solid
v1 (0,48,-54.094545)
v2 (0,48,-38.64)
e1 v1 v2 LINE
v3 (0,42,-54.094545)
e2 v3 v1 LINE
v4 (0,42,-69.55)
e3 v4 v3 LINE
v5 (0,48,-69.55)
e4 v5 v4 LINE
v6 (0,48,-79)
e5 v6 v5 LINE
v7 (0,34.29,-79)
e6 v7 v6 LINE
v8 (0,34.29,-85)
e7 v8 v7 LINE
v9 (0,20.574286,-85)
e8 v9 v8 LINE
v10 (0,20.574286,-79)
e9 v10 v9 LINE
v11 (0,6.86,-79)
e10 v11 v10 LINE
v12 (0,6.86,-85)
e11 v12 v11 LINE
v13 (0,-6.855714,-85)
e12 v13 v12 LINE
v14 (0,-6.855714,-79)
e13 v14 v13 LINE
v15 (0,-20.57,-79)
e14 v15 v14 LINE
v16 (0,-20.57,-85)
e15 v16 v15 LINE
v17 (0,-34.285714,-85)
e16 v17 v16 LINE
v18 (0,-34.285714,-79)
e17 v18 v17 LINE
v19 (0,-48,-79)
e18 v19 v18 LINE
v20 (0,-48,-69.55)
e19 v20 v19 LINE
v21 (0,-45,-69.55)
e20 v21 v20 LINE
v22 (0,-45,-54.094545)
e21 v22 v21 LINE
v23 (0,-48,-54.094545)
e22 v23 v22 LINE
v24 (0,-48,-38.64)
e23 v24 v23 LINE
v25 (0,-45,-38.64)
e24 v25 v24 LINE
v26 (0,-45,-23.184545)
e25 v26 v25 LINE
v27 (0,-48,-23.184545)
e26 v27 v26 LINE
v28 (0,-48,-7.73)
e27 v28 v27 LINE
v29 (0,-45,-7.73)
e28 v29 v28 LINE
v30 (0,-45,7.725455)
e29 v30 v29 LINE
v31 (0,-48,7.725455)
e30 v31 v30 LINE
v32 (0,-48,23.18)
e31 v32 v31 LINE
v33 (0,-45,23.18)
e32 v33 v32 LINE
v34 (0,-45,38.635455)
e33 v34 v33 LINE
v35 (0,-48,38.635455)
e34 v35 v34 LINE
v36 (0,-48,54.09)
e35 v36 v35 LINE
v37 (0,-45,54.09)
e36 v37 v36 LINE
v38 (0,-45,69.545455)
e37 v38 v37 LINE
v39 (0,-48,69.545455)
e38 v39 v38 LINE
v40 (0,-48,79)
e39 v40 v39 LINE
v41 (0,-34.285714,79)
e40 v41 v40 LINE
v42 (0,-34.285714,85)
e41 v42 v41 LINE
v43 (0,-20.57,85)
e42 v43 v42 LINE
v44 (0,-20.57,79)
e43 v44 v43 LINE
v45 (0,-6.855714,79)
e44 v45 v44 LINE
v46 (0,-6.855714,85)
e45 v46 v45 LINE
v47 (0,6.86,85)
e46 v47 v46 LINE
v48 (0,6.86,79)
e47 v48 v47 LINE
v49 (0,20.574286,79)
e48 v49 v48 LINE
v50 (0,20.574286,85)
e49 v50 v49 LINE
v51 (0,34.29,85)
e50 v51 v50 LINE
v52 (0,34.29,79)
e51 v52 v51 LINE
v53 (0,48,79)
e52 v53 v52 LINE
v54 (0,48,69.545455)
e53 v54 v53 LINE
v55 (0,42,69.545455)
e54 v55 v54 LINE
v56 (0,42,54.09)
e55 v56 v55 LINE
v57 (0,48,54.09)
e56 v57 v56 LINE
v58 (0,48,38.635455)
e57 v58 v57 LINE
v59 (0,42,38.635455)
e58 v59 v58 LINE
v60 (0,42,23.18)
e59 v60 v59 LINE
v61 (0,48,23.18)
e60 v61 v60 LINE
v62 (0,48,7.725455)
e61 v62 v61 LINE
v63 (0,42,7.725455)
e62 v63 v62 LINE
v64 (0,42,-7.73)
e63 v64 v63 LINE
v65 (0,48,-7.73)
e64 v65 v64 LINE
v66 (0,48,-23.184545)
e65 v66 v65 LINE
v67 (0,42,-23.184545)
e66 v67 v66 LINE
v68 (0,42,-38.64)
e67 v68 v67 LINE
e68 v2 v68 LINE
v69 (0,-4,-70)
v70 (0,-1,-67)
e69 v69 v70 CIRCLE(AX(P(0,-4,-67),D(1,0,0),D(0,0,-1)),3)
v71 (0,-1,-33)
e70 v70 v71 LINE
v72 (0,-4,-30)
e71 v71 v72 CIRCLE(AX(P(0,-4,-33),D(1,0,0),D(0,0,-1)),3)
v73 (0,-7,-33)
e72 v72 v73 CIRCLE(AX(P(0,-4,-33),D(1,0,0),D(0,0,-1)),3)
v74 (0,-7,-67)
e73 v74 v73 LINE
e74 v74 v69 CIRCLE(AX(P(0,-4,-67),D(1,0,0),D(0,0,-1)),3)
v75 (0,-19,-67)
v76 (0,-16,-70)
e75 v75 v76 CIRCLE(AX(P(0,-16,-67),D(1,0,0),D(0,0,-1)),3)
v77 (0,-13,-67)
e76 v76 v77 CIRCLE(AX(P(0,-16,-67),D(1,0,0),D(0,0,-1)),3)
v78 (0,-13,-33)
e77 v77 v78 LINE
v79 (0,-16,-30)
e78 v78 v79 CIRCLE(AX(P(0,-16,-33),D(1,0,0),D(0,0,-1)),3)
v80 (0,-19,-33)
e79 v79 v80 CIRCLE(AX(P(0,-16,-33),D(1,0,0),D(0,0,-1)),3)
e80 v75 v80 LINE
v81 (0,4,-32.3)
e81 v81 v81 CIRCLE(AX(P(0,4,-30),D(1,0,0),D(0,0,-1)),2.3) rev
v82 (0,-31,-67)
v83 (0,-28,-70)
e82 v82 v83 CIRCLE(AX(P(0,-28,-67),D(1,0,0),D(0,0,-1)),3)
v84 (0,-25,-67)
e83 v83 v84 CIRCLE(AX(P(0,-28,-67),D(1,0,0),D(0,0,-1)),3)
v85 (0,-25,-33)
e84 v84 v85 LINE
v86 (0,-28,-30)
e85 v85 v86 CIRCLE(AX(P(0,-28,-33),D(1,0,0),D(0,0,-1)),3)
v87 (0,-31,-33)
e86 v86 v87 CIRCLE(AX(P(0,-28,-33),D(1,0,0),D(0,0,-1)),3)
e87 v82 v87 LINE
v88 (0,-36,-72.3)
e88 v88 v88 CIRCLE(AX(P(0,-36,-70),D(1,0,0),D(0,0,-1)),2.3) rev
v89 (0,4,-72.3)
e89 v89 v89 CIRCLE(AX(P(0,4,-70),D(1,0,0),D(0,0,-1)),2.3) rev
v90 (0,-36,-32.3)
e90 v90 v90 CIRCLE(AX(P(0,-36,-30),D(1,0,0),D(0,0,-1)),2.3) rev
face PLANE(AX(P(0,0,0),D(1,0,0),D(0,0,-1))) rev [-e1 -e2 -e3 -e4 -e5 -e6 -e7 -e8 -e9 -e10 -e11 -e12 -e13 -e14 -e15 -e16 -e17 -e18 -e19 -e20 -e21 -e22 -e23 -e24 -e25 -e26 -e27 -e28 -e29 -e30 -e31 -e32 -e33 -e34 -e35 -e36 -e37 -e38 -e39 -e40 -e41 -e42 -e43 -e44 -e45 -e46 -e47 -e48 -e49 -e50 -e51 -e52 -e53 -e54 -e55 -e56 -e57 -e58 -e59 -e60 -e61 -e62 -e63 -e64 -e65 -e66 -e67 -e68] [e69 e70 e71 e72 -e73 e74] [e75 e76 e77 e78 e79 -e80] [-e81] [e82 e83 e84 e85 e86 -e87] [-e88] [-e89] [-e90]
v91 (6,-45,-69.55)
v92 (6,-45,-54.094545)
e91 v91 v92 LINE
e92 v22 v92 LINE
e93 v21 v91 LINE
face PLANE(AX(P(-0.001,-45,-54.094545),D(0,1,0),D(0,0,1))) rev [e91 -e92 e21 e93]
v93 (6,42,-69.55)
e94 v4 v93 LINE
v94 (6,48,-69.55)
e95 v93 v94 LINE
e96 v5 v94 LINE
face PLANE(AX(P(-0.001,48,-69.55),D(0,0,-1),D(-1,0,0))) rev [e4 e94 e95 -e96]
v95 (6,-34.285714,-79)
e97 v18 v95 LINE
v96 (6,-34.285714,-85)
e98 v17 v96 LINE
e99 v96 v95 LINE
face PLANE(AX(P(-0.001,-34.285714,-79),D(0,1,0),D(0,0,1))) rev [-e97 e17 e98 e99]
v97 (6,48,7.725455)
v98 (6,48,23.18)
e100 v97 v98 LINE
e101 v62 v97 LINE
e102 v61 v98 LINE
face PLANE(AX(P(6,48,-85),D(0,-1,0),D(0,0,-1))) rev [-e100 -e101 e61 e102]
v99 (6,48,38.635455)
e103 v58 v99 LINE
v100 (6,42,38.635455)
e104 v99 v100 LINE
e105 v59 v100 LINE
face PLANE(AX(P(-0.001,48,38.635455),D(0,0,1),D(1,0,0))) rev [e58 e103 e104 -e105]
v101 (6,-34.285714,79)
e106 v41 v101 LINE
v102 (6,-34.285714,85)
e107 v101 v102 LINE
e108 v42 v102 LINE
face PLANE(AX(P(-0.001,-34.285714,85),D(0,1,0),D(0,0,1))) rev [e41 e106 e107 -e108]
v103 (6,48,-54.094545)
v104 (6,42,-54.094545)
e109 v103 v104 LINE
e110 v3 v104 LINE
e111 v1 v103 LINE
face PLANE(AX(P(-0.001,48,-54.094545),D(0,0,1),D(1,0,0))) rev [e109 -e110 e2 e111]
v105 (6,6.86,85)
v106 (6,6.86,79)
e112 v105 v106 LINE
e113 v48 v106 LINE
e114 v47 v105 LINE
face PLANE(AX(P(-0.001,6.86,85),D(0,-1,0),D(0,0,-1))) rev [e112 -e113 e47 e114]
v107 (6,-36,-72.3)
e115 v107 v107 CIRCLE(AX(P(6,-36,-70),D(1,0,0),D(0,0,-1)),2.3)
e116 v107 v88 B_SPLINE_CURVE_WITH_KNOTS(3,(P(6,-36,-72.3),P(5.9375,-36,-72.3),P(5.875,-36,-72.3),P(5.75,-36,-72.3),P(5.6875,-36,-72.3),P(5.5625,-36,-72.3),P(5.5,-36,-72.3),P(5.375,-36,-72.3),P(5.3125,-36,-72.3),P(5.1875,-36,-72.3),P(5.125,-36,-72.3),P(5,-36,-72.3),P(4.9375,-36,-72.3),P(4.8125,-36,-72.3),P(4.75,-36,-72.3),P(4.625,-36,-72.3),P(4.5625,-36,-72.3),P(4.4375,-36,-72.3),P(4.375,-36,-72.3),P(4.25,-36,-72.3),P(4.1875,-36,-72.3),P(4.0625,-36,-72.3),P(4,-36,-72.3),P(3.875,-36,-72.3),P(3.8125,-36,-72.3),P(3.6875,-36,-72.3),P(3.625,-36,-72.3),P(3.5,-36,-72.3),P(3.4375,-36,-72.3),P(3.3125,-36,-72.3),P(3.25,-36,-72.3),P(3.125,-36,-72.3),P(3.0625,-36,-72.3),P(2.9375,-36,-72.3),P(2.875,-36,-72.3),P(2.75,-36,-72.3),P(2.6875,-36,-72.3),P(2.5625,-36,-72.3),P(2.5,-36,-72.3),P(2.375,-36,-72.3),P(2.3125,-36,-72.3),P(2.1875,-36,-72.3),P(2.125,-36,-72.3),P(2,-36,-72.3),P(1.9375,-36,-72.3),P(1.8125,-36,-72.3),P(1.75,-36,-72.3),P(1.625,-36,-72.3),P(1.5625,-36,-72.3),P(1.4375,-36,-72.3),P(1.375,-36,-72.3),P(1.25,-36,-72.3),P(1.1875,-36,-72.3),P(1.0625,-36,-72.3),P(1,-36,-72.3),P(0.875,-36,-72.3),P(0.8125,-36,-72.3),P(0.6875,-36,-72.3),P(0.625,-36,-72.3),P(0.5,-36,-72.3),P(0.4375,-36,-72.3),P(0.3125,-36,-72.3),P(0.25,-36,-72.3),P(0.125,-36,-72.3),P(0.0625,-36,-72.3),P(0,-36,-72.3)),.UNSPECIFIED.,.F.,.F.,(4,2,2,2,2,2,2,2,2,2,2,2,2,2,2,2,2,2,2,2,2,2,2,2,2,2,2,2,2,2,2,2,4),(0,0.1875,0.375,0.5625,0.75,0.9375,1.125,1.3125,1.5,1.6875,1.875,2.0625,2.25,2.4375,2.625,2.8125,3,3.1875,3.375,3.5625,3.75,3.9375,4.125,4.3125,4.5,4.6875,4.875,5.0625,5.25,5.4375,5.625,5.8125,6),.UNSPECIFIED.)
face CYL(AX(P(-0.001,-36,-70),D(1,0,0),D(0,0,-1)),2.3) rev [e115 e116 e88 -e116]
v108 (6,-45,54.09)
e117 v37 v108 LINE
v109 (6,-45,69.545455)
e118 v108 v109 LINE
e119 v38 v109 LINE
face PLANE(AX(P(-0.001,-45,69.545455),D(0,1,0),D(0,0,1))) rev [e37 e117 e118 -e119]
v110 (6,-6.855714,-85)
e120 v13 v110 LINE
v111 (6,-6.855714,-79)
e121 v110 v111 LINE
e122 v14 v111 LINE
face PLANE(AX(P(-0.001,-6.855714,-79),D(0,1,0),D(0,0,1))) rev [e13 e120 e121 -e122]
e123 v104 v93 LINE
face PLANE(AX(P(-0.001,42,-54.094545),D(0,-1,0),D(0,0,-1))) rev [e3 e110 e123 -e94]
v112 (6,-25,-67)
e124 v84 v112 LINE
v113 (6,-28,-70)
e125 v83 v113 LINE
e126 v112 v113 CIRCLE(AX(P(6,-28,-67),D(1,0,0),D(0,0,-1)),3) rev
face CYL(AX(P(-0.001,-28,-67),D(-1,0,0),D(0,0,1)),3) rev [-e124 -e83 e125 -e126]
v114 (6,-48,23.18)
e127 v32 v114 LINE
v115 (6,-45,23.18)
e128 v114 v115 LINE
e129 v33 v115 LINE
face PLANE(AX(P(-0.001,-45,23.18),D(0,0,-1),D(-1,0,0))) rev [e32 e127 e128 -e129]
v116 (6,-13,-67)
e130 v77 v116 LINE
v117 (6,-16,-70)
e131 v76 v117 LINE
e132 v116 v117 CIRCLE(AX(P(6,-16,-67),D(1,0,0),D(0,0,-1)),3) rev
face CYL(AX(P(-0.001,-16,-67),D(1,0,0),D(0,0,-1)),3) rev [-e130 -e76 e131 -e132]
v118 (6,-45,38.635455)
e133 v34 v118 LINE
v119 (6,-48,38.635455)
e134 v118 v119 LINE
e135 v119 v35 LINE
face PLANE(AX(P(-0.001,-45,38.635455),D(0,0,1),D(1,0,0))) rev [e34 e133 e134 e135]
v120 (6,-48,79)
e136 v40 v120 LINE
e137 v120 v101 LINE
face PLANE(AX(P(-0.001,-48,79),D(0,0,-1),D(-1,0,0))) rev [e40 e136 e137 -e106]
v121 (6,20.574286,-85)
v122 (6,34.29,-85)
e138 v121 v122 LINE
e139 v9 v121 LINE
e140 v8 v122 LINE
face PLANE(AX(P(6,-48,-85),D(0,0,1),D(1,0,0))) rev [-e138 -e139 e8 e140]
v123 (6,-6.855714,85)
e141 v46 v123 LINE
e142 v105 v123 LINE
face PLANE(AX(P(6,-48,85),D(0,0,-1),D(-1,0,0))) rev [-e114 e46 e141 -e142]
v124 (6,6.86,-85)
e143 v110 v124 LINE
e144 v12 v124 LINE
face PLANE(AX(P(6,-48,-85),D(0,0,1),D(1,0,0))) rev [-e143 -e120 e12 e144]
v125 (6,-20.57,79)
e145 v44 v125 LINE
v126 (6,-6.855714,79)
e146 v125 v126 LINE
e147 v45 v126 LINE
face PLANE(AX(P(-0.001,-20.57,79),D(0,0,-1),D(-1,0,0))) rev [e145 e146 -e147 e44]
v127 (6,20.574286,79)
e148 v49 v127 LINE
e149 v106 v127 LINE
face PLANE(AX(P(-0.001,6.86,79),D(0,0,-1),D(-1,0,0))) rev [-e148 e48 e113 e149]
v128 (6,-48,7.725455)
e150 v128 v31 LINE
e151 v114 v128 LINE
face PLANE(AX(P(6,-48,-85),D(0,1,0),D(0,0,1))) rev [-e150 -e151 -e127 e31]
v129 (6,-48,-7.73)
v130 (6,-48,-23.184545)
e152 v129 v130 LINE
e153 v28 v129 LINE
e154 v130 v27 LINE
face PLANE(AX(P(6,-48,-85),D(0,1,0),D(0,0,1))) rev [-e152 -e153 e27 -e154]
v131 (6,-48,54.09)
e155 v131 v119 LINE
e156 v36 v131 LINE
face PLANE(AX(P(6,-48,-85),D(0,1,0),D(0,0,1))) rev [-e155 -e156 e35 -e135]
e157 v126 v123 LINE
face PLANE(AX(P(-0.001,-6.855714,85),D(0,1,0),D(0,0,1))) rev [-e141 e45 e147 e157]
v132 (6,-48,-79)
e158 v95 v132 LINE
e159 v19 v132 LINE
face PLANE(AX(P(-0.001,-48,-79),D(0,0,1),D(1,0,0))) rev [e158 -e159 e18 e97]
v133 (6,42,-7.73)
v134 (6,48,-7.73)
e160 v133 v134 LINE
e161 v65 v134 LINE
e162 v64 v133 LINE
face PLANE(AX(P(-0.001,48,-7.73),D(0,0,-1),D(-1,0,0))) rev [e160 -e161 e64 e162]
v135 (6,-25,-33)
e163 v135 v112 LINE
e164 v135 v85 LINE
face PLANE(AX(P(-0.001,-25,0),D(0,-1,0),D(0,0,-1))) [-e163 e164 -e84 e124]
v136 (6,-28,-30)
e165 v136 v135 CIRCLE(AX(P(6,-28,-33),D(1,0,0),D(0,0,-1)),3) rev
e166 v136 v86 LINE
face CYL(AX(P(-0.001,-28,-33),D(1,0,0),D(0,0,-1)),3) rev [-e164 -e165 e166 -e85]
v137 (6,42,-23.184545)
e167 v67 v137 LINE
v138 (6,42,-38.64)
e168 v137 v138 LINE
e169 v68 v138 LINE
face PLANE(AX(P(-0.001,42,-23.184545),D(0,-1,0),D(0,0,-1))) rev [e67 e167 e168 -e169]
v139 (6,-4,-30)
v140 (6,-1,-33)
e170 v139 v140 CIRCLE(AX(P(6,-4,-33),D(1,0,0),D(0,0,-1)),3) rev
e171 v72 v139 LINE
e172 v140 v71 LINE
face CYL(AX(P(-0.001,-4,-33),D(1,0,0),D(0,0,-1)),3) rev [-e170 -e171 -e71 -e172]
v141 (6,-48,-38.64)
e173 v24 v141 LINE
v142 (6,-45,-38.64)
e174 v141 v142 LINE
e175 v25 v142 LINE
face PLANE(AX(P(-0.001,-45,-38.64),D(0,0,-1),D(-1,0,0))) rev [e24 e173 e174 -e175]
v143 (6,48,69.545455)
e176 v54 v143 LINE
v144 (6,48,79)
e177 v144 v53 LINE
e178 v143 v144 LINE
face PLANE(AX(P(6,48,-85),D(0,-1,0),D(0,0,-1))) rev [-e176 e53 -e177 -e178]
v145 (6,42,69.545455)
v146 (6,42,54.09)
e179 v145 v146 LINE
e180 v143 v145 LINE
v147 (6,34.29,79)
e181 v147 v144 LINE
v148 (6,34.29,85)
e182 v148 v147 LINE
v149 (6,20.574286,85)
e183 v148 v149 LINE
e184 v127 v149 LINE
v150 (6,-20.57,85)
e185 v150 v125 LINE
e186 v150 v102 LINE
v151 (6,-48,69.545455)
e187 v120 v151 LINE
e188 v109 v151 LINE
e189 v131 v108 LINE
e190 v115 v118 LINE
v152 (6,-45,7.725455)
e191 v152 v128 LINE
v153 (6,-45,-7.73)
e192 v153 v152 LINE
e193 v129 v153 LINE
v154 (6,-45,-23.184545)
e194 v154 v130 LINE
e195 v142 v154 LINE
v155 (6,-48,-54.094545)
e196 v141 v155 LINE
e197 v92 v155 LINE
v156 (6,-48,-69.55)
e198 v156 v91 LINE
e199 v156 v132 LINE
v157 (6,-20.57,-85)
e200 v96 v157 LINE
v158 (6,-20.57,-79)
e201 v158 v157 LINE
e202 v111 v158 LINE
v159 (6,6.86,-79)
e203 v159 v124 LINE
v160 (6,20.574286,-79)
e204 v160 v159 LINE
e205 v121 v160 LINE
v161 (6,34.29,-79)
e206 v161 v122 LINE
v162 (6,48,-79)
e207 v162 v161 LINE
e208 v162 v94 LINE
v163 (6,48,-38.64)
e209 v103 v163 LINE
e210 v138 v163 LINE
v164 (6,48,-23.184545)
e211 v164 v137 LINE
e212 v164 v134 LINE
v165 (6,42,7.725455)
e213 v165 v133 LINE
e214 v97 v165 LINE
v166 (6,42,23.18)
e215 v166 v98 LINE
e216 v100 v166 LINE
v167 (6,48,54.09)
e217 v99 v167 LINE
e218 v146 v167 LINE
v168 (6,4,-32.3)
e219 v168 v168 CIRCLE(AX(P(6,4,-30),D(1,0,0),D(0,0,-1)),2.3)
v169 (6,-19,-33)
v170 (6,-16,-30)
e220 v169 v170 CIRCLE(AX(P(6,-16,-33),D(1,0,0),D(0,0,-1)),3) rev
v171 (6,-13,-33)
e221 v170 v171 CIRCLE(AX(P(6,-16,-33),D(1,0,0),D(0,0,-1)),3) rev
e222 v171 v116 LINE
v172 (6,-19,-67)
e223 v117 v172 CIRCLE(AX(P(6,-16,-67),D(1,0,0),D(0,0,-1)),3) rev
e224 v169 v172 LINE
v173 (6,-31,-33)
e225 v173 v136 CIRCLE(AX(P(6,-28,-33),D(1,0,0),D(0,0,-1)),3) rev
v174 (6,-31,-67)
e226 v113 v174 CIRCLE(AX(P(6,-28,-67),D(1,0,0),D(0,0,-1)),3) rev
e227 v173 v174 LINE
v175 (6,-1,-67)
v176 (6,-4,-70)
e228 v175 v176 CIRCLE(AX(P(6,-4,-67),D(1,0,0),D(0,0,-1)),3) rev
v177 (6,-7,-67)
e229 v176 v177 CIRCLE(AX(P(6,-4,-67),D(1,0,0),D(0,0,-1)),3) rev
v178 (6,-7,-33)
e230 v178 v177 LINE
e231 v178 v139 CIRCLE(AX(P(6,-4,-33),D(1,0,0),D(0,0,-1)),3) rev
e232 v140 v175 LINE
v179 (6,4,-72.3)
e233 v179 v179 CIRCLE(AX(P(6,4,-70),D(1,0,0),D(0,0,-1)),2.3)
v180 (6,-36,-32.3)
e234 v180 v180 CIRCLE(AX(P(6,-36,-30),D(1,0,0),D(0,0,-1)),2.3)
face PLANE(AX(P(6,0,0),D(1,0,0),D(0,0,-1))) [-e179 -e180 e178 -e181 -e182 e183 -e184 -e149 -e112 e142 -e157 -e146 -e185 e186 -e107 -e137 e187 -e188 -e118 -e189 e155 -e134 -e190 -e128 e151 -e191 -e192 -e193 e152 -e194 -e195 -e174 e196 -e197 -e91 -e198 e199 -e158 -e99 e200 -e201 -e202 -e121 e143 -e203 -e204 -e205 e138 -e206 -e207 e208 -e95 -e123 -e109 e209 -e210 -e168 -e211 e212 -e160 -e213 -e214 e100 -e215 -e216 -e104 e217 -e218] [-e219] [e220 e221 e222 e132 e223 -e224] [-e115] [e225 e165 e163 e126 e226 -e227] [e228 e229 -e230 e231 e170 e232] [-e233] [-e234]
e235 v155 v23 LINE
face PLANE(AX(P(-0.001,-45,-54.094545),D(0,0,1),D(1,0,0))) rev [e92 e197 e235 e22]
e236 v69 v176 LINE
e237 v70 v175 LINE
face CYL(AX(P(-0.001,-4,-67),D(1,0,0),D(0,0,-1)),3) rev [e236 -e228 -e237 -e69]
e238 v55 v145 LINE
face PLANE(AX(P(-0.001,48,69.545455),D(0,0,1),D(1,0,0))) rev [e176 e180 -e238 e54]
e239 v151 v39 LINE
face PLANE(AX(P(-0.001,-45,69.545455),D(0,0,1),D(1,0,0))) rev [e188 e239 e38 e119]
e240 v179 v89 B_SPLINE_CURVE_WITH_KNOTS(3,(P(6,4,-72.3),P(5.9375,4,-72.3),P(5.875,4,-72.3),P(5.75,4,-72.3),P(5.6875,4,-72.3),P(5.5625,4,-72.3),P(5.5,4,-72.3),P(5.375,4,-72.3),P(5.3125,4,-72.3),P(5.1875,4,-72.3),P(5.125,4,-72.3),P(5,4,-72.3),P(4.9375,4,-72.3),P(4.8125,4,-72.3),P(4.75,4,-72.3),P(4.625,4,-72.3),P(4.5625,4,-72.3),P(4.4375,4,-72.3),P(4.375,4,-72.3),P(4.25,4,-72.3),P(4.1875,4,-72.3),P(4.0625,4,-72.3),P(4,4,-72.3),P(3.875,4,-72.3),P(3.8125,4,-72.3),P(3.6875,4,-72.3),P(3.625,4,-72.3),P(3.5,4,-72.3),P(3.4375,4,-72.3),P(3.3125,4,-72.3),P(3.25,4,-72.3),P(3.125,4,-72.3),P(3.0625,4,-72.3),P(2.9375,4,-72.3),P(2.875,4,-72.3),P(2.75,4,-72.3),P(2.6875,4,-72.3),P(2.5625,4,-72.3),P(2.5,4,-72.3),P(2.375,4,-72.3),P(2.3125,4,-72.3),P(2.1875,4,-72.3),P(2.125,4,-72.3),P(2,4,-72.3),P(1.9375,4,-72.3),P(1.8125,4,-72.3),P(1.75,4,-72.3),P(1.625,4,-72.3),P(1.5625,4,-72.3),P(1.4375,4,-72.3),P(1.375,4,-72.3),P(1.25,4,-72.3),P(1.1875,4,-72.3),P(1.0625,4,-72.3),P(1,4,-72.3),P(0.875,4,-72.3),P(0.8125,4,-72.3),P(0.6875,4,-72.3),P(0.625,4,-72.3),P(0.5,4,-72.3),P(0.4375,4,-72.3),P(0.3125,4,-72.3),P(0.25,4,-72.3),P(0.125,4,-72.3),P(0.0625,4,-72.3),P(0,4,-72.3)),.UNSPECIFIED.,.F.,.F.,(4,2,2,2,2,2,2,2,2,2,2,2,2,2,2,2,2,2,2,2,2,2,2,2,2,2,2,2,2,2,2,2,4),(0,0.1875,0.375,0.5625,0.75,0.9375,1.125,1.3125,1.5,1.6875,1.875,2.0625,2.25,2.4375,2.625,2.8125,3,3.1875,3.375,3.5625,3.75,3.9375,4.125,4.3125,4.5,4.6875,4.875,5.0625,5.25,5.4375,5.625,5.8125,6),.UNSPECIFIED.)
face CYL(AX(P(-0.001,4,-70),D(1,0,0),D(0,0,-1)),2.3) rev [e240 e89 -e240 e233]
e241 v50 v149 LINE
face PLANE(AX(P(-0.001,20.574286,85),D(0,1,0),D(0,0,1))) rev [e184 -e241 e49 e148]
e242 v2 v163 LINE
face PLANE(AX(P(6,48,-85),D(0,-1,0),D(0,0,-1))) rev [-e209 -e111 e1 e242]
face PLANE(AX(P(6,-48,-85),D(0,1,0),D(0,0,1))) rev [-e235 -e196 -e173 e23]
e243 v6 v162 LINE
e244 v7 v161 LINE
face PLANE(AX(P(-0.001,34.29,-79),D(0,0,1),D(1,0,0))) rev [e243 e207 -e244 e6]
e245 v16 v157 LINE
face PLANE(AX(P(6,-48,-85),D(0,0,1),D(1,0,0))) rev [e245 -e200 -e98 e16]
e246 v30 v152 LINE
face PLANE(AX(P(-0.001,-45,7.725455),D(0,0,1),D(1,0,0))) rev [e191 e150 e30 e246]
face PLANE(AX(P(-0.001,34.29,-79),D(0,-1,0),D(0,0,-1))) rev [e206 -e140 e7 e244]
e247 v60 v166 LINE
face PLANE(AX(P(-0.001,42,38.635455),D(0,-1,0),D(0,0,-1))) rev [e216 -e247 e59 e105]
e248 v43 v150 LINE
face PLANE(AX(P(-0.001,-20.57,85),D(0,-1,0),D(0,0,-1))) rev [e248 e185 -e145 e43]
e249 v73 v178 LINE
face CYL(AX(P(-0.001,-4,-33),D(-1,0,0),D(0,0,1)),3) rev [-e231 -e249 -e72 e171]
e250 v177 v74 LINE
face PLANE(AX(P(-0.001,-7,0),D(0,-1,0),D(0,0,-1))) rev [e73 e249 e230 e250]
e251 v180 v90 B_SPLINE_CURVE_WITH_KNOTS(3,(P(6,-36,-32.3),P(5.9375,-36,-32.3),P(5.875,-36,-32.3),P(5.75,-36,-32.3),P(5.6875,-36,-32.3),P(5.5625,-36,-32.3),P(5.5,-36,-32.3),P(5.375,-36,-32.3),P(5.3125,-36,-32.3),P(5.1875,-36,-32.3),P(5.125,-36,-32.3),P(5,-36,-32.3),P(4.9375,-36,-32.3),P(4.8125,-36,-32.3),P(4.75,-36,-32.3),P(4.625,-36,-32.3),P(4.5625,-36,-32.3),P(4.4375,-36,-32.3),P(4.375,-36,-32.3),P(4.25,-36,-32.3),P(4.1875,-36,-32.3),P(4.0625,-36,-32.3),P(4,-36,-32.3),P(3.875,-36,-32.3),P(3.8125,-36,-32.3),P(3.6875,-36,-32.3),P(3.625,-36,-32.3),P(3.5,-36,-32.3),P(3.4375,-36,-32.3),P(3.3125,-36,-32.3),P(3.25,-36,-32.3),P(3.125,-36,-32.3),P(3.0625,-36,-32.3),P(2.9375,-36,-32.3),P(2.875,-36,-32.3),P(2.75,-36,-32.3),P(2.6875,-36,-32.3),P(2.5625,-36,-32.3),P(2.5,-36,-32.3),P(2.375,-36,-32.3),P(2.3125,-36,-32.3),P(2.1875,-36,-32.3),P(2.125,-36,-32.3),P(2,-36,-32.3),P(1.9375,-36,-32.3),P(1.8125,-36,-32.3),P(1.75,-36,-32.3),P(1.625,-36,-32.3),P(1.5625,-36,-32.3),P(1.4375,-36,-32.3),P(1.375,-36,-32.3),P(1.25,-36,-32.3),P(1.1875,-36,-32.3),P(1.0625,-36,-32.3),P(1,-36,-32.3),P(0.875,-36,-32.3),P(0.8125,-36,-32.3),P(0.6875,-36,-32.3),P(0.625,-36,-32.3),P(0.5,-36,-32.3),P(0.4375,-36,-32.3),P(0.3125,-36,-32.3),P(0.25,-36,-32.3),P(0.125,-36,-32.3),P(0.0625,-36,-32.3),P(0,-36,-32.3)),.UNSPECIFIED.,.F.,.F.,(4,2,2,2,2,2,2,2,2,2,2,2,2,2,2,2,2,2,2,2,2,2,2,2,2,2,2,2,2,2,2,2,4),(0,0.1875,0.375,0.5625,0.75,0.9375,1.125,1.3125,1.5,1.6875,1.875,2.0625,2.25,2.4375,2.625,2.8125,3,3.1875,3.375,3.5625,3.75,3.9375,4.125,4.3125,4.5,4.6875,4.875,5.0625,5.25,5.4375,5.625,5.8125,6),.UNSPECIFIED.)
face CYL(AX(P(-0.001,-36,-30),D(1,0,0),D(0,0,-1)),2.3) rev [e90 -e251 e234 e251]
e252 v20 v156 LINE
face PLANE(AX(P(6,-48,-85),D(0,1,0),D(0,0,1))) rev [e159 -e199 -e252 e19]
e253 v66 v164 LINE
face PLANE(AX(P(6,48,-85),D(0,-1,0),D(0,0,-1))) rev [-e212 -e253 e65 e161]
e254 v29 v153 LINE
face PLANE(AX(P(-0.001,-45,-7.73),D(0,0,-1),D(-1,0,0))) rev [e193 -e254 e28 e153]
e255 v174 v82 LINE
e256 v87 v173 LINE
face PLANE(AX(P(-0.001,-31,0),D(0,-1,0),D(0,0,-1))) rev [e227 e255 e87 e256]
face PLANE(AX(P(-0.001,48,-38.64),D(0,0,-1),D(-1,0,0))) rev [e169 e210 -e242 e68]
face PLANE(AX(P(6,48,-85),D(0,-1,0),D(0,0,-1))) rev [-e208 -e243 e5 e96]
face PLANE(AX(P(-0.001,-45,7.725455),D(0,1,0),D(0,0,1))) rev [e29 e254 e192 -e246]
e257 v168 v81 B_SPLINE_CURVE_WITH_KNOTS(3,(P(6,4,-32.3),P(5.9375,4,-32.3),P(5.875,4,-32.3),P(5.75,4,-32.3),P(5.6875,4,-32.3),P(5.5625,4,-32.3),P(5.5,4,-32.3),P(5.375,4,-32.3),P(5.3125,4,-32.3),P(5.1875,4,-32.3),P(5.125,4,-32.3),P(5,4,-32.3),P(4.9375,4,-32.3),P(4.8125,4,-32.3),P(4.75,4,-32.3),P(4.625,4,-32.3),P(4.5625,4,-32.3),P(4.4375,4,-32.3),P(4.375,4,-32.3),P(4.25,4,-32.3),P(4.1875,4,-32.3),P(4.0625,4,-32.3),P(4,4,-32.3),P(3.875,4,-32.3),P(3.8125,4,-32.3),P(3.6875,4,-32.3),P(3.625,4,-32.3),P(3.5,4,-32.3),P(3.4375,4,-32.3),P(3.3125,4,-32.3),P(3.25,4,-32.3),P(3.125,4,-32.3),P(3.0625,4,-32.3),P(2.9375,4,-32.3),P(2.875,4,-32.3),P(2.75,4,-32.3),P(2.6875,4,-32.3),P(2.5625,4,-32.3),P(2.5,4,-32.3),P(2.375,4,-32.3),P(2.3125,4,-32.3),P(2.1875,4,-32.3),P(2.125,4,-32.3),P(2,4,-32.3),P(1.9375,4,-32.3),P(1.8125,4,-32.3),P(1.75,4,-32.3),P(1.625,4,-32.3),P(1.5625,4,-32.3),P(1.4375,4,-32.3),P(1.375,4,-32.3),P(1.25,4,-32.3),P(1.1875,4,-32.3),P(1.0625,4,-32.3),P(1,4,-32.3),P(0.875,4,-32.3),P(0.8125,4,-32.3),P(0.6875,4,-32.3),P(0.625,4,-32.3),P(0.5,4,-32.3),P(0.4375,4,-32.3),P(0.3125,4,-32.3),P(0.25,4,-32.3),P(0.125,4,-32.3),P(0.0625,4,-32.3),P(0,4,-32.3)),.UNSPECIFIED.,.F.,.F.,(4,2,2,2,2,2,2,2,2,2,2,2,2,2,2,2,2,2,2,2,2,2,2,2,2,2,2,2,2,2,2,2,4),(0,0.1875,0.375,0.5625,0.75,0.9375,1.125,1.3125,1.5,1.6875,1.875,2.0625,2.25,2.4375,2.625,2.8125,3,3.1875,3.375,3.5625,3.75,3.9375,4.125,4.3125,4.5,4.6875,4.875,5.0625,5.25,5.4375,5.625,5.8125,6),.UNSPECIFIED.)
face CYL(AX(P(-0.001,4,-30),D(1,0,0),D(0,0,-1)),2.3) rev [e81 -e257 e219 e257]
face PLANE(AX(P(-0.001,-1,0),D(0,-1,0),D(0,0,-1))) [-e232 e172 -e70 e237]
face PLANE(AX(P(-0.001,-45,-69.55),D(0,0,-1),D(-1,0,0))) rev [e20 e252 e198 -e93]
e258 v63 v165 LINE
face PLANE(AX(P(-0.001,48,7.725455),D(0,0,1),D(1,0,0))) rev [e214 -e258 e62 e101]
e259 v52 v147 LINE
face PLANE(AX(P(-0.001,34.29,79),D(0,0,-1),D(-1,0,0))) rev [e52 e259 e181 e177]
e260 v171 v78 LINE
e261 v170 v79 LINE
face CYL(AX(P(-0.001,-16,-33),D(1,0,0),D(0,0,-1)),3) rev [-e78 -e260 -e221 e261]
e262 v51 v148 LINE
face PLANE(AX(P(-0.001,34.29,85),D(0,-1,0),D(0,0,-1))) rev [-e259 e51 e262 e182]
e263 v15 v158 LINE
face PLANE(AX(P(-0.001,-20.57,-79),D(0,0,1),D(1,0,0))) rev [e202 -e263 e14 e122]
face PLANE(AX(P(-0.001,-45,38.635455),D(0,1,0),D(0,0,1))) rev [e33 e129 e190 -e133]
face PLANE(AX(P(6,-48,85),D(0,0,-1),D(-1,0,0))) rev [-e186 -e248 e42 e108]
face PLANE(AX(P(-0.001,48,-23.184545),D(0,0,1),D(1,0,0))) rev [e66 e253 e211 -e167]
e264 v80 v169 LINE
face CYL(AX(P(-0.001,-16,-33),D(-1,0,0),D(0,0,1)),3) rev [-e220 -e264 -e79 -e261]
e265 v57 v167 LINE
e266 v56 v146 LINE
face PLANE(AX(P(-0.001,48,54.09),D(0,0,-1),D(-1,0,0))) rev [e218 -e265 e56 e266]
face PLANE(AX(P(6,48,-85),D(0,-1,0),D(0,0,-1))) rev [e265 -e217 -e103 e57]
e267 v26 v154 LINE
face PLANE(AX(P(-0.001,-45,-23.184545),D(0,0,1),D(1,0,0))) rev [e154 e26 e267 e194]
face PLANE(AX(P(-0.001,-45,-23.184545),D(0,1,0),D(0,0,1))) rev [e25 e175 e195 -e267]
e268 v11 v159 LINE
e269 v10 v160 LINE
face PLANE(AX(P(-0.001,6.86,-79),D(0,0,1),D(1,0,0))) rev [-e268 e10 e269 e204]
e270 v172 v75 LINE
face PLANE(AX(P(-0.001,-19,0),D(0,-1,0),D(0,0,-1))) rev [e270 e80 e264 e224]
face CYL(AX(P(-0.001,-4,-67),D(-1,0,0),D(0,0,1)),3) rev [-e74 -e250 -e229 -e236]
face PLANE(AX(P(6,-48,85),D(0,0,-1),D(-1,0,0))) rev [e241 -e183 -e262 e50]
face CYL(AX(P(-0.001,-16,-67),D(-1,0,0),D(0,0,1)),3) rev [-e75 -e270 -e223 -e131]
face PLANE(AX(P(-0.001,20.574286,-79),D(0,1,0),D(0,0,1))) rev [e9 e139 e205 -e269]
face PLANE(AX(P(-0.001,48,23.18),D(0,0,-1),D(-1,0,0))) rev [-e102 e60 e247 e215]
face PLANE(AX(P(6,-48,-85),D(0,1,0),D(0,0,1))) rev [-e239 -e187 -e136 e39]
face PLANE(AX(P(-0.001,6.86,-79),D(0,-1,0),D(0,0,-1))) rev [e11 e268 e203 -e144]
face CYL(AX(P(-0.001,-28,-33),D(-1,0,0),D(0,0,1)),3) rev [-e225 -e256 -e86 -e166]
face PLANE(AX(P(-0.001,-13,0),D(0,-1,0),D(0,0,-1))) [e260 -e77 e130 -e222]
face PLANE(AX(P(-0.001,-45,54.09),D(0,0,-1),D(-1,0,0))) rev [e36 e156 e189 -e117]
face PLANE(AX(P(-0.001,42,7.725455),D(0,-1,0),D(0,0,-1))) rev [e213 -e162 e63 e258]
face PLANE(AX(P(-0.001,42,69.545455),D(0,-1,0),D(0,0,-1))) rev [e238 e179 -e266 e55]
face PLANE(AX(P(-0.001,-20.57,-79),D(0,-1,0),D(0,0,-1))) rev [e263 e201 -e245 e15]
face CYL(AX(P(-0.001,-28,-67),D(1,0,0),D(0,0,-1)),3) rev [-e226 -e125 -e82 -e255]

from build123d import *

# Parameters (mm, degrees)
ESBO_O1_W                = 170
ESBO_O1_H                = 96
RESSALTO_EXTRUS_O1_DEPTH = 6
CORTE_EXTRUS_O1_REACH    = 99.801
ESBO_O2_W                = 15.455454545
ESBO_O2_H                = 6
CORTE_EXTRUS_O2_REACH    = 99.801
ESBO_O3_W                = 6
ESBO_O3_H                = 13.714285714
CORTE_EXTRUS_O3_REACH    = 99.801
ESBO_O4_W                = 40
ESBO_O4_H                = 6
ESBO_O4_R                = 2.3
FILETE1_R                = 3


with BuildPart() as part:
    # Esboço1 → Ressalto-extrusão1 (new body)
    with BuildSketch(Plane(origin=(0, 0, 0), x_dir=(0, 0, -1), z_dir=(1, 0, 0))):
        Rectangle(ESBO_O1_W, ESBO_O1_H)
    extrude(amount=RESSALTO_EXTRUS_O1_DEPTH)

    # Esboço2 → Corte-extrusão1 (cut, up to next)
    with BuildSketch(Plane(origin=(6, 0, 0), x_dir=(0, 0, -1), z_dir=(1, 0, 0)), mode=Mode.PRIVATE) as corte_extrus_o1_sk1:
        with Locations((0.002272727, 45)):
            Rectangle(ESBO_O2_W, ESBO_O2_H)
    corte_extrus_o1_tool1 = extrude(corte_extrus_o1_sk1.sketch, amount=-CORTE_EXTRUS_O1_REACH, mode=Mode.PRIVATE) & part.part
    # Esboço2 → Corte-extrusão1 (cut, up to next)
    with BuildSketch(Plane(origin=(6, 0, 0), x_dir=(0, 0, -1), z_dir=(1, 0, 0)), mode=Mode.PRIVATE) as corte_extrus_o1_sk2:
        with Locations((-30.907727273, 45)):
            Rectangle(ESBO_O2_W, ESBO_O2_H)
    corte_extrus_o1_tool2 = extrude(corte_extrus_o1_sk2.sketch, amount=-CORTE_EXTRUS_O1_REACH, mode=Mode.PRIVATE) & part.part
    # Esboço2 → Corte-extrusão1 (cut, up to next)
    with BuildSketch(Plane(origin=(6, 0, 0), x_dir=(0, 0, -1), z_dir=(1, 0, 0)), mode=Mode.PRIVATE) as corte_extrus_o1_sk3:
        with Locations((-61.817727273, 45)):
            Rectangle(ESBO_O2_W, ESBO_O2_H)
    corte_extrus_o1_tool3 = extrude(corte_extrus_o1_sk3.sketch, amount=-CORTE_EXTRUS_O1_REACH, mode=Mode.PRIVATE) & part.part
    # Esboço2 → Corte-extrusão1 (cut, up to next)
    with BuildSketch(Plane(origin=(6, 0, 0), x_dir=(0, 0, -1), z_dir=(1, 0, 0)), mode=Mode.PRIVATE) as corte_extrus_o1_sk4:
        with Locations((30.912272728, 45)):
            Rectangle(ESBO_O2_W, ESBO_O2_H)
    corte_extrus_o1_tool4 = extrude(corte_extrus_o1_sk4.sketch, amount=-CORTE_EXTRUS_O1_REACH, mode=Mode.PRIVATE) & part.part
    # Esboço2 → Corte-extrusão1 (cut, up to next)
    with BuildSketch(Plane(origin=(6, 0, 0), x_dir=(0, 0, -1), z_dir=(1, 0, 0)), mode=Mode.PRIVATE) as corte_extrus_o1_sk5:
        with Locations((61.822272728, 45)):
            Rectangle(ESBO_O2_W, ESBO_O2_H)
    corte_extrus_o1_tool5 = extrude(corte_extrus_o1_sk5.sketch, amount=-CORTE_EXTRUS_O1_REACH, mode=Mode.PRIVATE) & part.part
    # Esboço2 → Corte-extrusão1 (cut, up to next)
    with BuildSketch(Plane(origin=(6, 0, 0), x_dir=(0, 0, -1), z_dir=(1, 0, 0)), mode=Mode.PRIVATE) as corte_extrus_o1_sk6:
        with Locations((-61.817727273, -48)):
            Rectangle(ESBO_O2_W, ESBO_O2_H)
    corte_extrus_o1_tool6 = extrude(corte_extrus_o1_sk6.sketch, amount=-CORTE_EXTRUS_O1_REACH, mode=Mode.PRIVATE) & part.part
    # Esboço2 → Corte-extrusão1 (cut, up to next)
    with BuildSketch(Plane(origin=(6, 0, 0), x_dir=(0, 0, -1), z_dir=(1, 0, 0)), mode=Mode.PRIVATE) as corte_extrus_o1_sk7:
        with Locations((-30.907727273, -48)):
            Rectangle(ESBO_O2_W, ESBO_O2_H)
    corte_extrus_o1_tool7 = extrude(corte_extrus_o1_sk7.sketch, amount=-CORTE_EXTRUS_O1_REACH, mode=Mode.PRIVATE) & part.part
    # Esboço2 → Corte-extrusão1 (cut, up to next)
    with BuildSketch(Plane(origin=(6, 0, 0), x_dir=(0, 0, -1), z_dir=(1, 0, 0)), mode=Mode.PRIVATE) as corte_extrus_o1_sk8:
        with Locations((0.002272727, -48)):
            Rectangle(ESBO_O2_W, ESBO_O2_H)
    corte_extrus_o1_tool8 = extrude(corte_extrus_o1_sk8.sketch, amount=-CORTE_EXTRUS_O1_REACH, mode=Mode.PRIVATE) & part.part
    # Esboço2 → Corte-extrusão1 (cut, up to next)
    with BuildSketch(Plane(origin=(6, 0, 0), x_dir=(0, 0, -1), z_dir=(1, 0, 0)), mode=Mode.PRIVATE) as corte_extrus_o1_sk9:
        with Locations((30.912272728, -48)):
            Rectangle(ESBO_O2_W, ESBO_O2_H)
    corte_extrus_o1_tool9 = extrude(corte_extrus_o1_sk9.sketch, amount=-CORTE_EXTRUS_O1_REACH, mode=Mode.PRIVATE) & part.part
    # Esboço2 → Corte-extrusão1 (cut, up to next)
    with BuildSketch(Plane(origin=(6, 0, 0), x_dir=(0, 0, -1), z_dir=(1, 0, 0)), mode=Mode.PRIVATE) as corte_extrus_o1_sk10:
        with Locations((61.822272728, -48)):
            Rectangle(ESBO_O2_W, ESBO_O2_H)
    corte_extrus_o1_tool10 = extrude(corte_extrus_o1_sk10.sketch, amount=-CORTE_EXTRUS_O1_REACH, mode=Mode.PRIVATE) & part.part
    add(corte_extrus_o1_tool1.solids().sort_by_distance((6, 45, -0.002273))[0], mode=Mode.SUBTRACT)
    add(corte_extrus_o1_tool2.solids().sort_by_distance((6, 45, 30.907727))[0], mode=Mode.SUBTRACT)
    add(corte_extrus_o1_tool3.solids().sort_by_distance((6, 45, 61.817727))[0], mode=Mode.SUBTRACT)
    add(corte_extrus_o1_tool4.solids().sort_by_distance((6, 45, -30.912273))[0], mode=Mode.SUBTRACT)
    add(corte_extrus_o1_tool5.solids().sort_by_distance((6, 45, -61.822273))[0], mode=Mode.SUBTRACT)
    add(corte_extrus_o1_tool6.solids().sort_by_distance((6, -48, 61.817727))[0], mode=Mode.SUBTRACT)
    add(corte_extrus_o1_tool7.solids().sort_by_distance((6, -48, 30.907727))[0], mode=Mode.SUBTRACT)
    add(corte_extrus_o1_tool8.solids().sort_by_distance((6, -48, -0.002273))[0], mode=Mode.SUBTRACT)
    add(corte_extrus_o1_tool9.solids().sort_by_distance((6, -48, -30.912273))[0], mode=Mode.SUBTRACT)
    add(corte_extrus_o1_tool10.solids().sort_by_distance((6, -48, -61.822273))[0], mode=Mode.SUBTRACT)

    # Esboço3 → Corte-extrusão2 (cut, up to next)
    with BuildSketch(Plane(origin=(6, 0, 0), x_dir=(0, 0, -1), z_dir=(1, 0, 0)), mode=Mode.PRIVATE) as corte_extrus_o2_sk1:
        with Locations((82, -41.142857143)):
            Rectangle(ESBO_O3_W, ESBO_O3_H)
    corte_extrus_o2_tool1 = extrude(corte_extrus_o2_sk1.sketch, amount=-CORTE_EXTRUS_O2_REACH, mode=Mode.PRIVATE) & part.part
    # Esboço3 → Corte-extrusão2 (cut, up to next)
    with BuildSketch(Plane(origin=(6, 0, 0), x_dir=(0, 0, -1), z_dir=(1, 0, 0)), mode=Mode.PRIVATE) as corte_extrus_o2_sk2:
        with Locations((-82, -41.142857143)):
            Rectangle(ESBO_O3_W, ESBO_O3_H)
    corte_extrus_o2_tool2 = extrude(corte_extrus_o2_sk2.sketch, amount=-CORTE_EXTRUS_O2_REACH, mode=Mode.PRIVATE) & part.part
    # Esboço3 → Corte-extrusão2 (cut, up to next)
    with BuildSketch(Plane(origin=(6, 0, 0), x_dir=(0, 0, -1), z_dir=(1, 0, 0)), mode=Mode.PRIVATE) as corte_extrus_o2_sk3:
        with Locations((82, -13.712857143)):
            Rectangle(ESBO_O3_W, ESBO_O3_H)
    corte_extrus_o2_tool3 = extrude(corte_extrus_o2_sk3.sketch, amount=-CORTE_EXTRUS_O2_REACH, mode=Mode.PRIVATE) & part.part
    # Esboço3 → Corte-extrusão2 (cut, up to next)
    with BuildSketch(Plane(origin=(6, 0, 0), x_dir=(0, 0, -1), z_dir=(1, 0, 0)), mode=Mode.PRIVATE) as corte_extrus_o2_sk4:
        with Locations((82, 13.717142857)):
            Rectangle(ESBO_O3_W, ESBO_O3_H)
    corte_extrus_o2_tool4 = extrude(corte_extrus_o2_sk4.sketch, amount=-CORTE_EXTRUS_O2_REACH, mode=Mode.PRIVATE) & part.part
    # Esboço3 → Corte-extrusão2 (cut, up to next)
    with BuildSketch(Plane(origin=(6, 0, 0), x_dir=(0, 0, -1), z_dir=(1, 0, 0)), mode=Mode.PRIVATE) as corte_extrus_o2_sk5:
        with Locations((82, 41.147142857)):
            Rectangle(ESBO_O3_W, ESBO_O3_H)
    corte_extrus_o2_tool5 = extrude(corte_extrus_o2_sk5.sketch, amount=-CORTE_EXTRUS_O2_REACH, mode=Mode.PRIVATE) & part.part
    # Esboço3 → Corte-extrusão2 (cut, up to next)
    with BuildSketch(Plane(origin=(6, 0, 0), x_dir=(0, 0, -1), z_dir=(1, 0, 0)), mode=Mode.PRIVATE) as corte_extrus_o2_sk6:
        with Locations((-82, -13.712857143)):
            Rectangle(ESBO_O3_W, ESBO_O3_H)
    corte_extrus_o2_tool6 = extrude(corte_extrus_o2_sk6.sketch, amount=-CORTE_EXTRUS_O2_REACH, mode=Mode.PRIVATE) & part.part
    # Esboço3 → Corte-extrusão2 (cut, up to next)
    with BuildSketch(Plane(origin=(6, 0, 0), x_dir=(0, 0, -1), z_dir=(1, 0, 0)), mode=Mode.PRIVATE) as corte_extrus_o2_sk7:
        with Locations((-82, 13.717142857)):
            Rectangle(ESBO_O3_W, ESBO_O3_H)
    corte_extrus_o2_tool7 = extrude(corte_extrus_o2_sk7.sketch, amount=-CORTE_EXTRUS_O2_REACH, mode=Mode.PRIVATE) & part.part
    # Esboço3 → Corte-extrusão2 (cut, up to next)
    with BuildSketch(Plane(origin=(6, 0, 0), x_dir=(0, 0, -1), z_dir=(1, 0, 0)), mode=Mode.PRIVATE) as corte_extrus_o2_sk8:
        with Locations((-82, 41.147142857)):
            Rectangle(ESBO_O3_W, ESBO_O3_H)
    corte_extrus_o2_tool8 = extrude(corte_extrus_o2_sk8.sketch, amount=-CORTE_EXTRUS_O2_REACH, mode=Mode.PRIVATE) & part.part
    add(corte_extrus_o2_tool1.solids().sort_by_distance((6, -41.142857, -82))[0], mode=Mode.SUBTRACT)
    add(corte_extrus_o2_tool2.solids().sort_by_distance((6, -41.142857, 82))[0], mode=Mode.SUBTRACT)
    add(corte_extrus_o2_tool3.solids().sort_by_distance((6, -13.712857, -82))[0], mode=Mode.SUBTRACT)
    add(corte_extrus_o2_tool4.solids().sort_by_distance((6, 13.717143, -82))[0], mode=Mode.SUBTRACT)
    add(corte_extrus_o2_tool5.solids().sort_by_distance((6, 41.147143, -82))[0], mode=Mode.SUBTRACT)
    add(corte_extrus_o2_tool6.solids().sort_by_distance((6, -13.712857, 82))[0], mode=Mode.SUBTRACT)
    add(corte_extrus_o2_tool7.solids().sort_by_distance((6, 13.717143, 82))[0], mode=Mode.SUBTRACT)
    add(corte_extrus_o2_tool8.solids().sort_by_distance((6, 41.147143, 82))[0], mode=Mode.SUBTRACT)

    # Esboço4 → Corte-extrusão3 (cut, up to next)
    with BuildSketch(Plane(origin=(6, 0, 0), x_dir=(0, 0, -1), z_dir=(1, 0, 0)), mode=Mode.PRIVATE) as corte_extrus_o3_sk1:
        with Locations((50, -4)):
            Rectangle(ESBO_O4_W, ESBO_O4_H)
    corte_extrus_o3_tool1 = extrude(corte_extrus_o3_sk1.sketch, amount=-CORTE_EXTRUS_O3_REACH, mode=Mode.PRIVATE) & part.part
    # Esboço4 → Corte-extrusão3 (cut, up to next)
    with BuildSketch(Plane(origin=(6, 0, 0), x_dir=(0, 0, -1), z_dir=(1, 0, 0)), mode=Mode.PRIVATE) as corte_extrus_o3_sk2:
        with Locations((50, -16)):
            Rectangle(ESBO_O4_W, ESBO_O4_H)
    corte_extrus_o3_tool2 = extrude(corte_extrus_o3_sk2.sketch, amount=-CORTE_EXTRUS_O3_REACH, mode=Mode.PRIVATE) & part.part
    # Esboço4 → Corte-extrusão3 (cut, up to next)
    with BuildSketch(Plane(origin=(6, 0, 0), x_dir=(0, 0, -1), z_dir=(1, 0, 0)), mode=Mode.PRIVATE) as corte_extrus_o3_sk3:
        with Locations((50, -28)):
            Rectangle(ESBO_O4_W, ESBO_O4_H)
    corte_extrus_o3_tool3 = extrude(corte_extrus_o3_sk3.sketch, amount=-CORTE_EXTRUS_O3_REACH, mode=Mode.PRIVATE) & part.part
    # Esboço4 → Corte-extrusão3 (cut, up to next)
    with BuildSketch(Plane(origin=(6, 0, 0), x_dir=(0, 0, -1), z_dir=(1, 0, 0)), mode=Mode.PRIVATE) as corte_extrus_o3_sk4:
        with Locations((30, -36)):
            Circle(ESBO_O4_R)
    corte_extrus_o3_tool4 = extrude(corte_extrus_o3_sk4.sketch, amount=-CORTE_EXTRUS_O3_REACH, mode=Mode.PRIVATE) & part.part
    # Esboço4 → Corte-extrusão3 (cut, up to next)
    with BuildSketch(Plane(origin=(6, 0, 0), x_dir=(0, 0, -1), z_dir=(1, 0, 0)), mode=Mode.PRIVATE) as corte_extrus_o3_sk5:
        with Locations((70, -36)):
            Circle(ESBO_O4_R)
    corte_extrus_o3_tool5 = extrude(corte_extrus_o3_sk5.sketch, amount=-CORTE_EXTRUS_O3_REACH, mode=Mode.PRIVATE) & part.part
    # Esboço4 → Corte-extrusão3 (cut, up to next)
    with BuildSketch(Plane(origin=(6, 0, 0), x_dir=(0, 0, -1), z_dir=(1, 0, 0)), mode=Mode.PRIVATE) as corte_extrus_o3_sk6:
        with Locations((70, 4)):
            Circle(ESBO_O4_R)
    corte_extrus_o3_tool6 = extrude(corte_extrus_o3_sk6.sketch, amount=-CORTE_EXTRUS_O3_REACH, mode=Mode.PRIVATE) & part.part
    # Esboço4 → Corte-extrusão3 (cut, up to next)
    with BuildSketch(Plane(origin=(6, 0, 0), x_dir=(0, 0, -1), z_dir=(1, 0, 0)), mode=Mode.PRIVATE) as corte_extrus_o3_sk7:
        with Locations((30, 4)):
            Circle(ESBO_O4_R)
    corte_extrus_o3_tool7 = extrude(corte_extrus_o3_sk7.sketch, amount=-CORTE_EXTRUS_O3_REACH, mode=Mode.PRIVATE) & part.part
    add(corte_extrus_o3_tool1.solids().sort_by_distance((6, -4, -50))[0], mode=Mode.SUBTRACT)
    add(corte_extrus_o3_tool2.solids().sort_by_distance((6, -16, -50))[0], mode=Mode.SUBTRACT)
    add(corte_extrus_o3_tool3.solids().sort_by_distance((6, -28, -50))[0], mode=Mode.SUBTRACT)
    add(corte_extrus_o3_tool4.solids().sort_by_distance((6, -36, -30))[0], mode=Mode.SUBTRACT)
    add(corte_extrus_o3_tool5.solids().sort_by_distance((6, -36, -70))[0], mode=Mode.SUBTRACT)
    add(corte_extrus_o3_tool6.solids().sort_by_distance((6, 4, -70))[0], mode=Mode.SUBTRACT)
    add(corte_extrus_o3_tool7.solids().sort_by_distance((6, 4, -30))[0], mode=Mode.SUBTRACT)

    # Filete1
    filete1_edges = [part.edges().sort_by_distance(p)[0] for p in [
        (3, -13, -70),
        (3, -25, -70),
        (3, -13, -30),
        (3, -25, -30),
        (3, -19, -70),
        (3, -31, -70),
        (3, -31, -30),
        (3, -19, -30),
        (3, -1, -70),
        (3, -7, -70),
        (3, -7, -30),
        (3, -1, -30),
    ]]
    fillet(filete1_edges, radius=FILETE1_R - 0.0001)  # a hair under: the kernel refuses the full size


solid = part.part
